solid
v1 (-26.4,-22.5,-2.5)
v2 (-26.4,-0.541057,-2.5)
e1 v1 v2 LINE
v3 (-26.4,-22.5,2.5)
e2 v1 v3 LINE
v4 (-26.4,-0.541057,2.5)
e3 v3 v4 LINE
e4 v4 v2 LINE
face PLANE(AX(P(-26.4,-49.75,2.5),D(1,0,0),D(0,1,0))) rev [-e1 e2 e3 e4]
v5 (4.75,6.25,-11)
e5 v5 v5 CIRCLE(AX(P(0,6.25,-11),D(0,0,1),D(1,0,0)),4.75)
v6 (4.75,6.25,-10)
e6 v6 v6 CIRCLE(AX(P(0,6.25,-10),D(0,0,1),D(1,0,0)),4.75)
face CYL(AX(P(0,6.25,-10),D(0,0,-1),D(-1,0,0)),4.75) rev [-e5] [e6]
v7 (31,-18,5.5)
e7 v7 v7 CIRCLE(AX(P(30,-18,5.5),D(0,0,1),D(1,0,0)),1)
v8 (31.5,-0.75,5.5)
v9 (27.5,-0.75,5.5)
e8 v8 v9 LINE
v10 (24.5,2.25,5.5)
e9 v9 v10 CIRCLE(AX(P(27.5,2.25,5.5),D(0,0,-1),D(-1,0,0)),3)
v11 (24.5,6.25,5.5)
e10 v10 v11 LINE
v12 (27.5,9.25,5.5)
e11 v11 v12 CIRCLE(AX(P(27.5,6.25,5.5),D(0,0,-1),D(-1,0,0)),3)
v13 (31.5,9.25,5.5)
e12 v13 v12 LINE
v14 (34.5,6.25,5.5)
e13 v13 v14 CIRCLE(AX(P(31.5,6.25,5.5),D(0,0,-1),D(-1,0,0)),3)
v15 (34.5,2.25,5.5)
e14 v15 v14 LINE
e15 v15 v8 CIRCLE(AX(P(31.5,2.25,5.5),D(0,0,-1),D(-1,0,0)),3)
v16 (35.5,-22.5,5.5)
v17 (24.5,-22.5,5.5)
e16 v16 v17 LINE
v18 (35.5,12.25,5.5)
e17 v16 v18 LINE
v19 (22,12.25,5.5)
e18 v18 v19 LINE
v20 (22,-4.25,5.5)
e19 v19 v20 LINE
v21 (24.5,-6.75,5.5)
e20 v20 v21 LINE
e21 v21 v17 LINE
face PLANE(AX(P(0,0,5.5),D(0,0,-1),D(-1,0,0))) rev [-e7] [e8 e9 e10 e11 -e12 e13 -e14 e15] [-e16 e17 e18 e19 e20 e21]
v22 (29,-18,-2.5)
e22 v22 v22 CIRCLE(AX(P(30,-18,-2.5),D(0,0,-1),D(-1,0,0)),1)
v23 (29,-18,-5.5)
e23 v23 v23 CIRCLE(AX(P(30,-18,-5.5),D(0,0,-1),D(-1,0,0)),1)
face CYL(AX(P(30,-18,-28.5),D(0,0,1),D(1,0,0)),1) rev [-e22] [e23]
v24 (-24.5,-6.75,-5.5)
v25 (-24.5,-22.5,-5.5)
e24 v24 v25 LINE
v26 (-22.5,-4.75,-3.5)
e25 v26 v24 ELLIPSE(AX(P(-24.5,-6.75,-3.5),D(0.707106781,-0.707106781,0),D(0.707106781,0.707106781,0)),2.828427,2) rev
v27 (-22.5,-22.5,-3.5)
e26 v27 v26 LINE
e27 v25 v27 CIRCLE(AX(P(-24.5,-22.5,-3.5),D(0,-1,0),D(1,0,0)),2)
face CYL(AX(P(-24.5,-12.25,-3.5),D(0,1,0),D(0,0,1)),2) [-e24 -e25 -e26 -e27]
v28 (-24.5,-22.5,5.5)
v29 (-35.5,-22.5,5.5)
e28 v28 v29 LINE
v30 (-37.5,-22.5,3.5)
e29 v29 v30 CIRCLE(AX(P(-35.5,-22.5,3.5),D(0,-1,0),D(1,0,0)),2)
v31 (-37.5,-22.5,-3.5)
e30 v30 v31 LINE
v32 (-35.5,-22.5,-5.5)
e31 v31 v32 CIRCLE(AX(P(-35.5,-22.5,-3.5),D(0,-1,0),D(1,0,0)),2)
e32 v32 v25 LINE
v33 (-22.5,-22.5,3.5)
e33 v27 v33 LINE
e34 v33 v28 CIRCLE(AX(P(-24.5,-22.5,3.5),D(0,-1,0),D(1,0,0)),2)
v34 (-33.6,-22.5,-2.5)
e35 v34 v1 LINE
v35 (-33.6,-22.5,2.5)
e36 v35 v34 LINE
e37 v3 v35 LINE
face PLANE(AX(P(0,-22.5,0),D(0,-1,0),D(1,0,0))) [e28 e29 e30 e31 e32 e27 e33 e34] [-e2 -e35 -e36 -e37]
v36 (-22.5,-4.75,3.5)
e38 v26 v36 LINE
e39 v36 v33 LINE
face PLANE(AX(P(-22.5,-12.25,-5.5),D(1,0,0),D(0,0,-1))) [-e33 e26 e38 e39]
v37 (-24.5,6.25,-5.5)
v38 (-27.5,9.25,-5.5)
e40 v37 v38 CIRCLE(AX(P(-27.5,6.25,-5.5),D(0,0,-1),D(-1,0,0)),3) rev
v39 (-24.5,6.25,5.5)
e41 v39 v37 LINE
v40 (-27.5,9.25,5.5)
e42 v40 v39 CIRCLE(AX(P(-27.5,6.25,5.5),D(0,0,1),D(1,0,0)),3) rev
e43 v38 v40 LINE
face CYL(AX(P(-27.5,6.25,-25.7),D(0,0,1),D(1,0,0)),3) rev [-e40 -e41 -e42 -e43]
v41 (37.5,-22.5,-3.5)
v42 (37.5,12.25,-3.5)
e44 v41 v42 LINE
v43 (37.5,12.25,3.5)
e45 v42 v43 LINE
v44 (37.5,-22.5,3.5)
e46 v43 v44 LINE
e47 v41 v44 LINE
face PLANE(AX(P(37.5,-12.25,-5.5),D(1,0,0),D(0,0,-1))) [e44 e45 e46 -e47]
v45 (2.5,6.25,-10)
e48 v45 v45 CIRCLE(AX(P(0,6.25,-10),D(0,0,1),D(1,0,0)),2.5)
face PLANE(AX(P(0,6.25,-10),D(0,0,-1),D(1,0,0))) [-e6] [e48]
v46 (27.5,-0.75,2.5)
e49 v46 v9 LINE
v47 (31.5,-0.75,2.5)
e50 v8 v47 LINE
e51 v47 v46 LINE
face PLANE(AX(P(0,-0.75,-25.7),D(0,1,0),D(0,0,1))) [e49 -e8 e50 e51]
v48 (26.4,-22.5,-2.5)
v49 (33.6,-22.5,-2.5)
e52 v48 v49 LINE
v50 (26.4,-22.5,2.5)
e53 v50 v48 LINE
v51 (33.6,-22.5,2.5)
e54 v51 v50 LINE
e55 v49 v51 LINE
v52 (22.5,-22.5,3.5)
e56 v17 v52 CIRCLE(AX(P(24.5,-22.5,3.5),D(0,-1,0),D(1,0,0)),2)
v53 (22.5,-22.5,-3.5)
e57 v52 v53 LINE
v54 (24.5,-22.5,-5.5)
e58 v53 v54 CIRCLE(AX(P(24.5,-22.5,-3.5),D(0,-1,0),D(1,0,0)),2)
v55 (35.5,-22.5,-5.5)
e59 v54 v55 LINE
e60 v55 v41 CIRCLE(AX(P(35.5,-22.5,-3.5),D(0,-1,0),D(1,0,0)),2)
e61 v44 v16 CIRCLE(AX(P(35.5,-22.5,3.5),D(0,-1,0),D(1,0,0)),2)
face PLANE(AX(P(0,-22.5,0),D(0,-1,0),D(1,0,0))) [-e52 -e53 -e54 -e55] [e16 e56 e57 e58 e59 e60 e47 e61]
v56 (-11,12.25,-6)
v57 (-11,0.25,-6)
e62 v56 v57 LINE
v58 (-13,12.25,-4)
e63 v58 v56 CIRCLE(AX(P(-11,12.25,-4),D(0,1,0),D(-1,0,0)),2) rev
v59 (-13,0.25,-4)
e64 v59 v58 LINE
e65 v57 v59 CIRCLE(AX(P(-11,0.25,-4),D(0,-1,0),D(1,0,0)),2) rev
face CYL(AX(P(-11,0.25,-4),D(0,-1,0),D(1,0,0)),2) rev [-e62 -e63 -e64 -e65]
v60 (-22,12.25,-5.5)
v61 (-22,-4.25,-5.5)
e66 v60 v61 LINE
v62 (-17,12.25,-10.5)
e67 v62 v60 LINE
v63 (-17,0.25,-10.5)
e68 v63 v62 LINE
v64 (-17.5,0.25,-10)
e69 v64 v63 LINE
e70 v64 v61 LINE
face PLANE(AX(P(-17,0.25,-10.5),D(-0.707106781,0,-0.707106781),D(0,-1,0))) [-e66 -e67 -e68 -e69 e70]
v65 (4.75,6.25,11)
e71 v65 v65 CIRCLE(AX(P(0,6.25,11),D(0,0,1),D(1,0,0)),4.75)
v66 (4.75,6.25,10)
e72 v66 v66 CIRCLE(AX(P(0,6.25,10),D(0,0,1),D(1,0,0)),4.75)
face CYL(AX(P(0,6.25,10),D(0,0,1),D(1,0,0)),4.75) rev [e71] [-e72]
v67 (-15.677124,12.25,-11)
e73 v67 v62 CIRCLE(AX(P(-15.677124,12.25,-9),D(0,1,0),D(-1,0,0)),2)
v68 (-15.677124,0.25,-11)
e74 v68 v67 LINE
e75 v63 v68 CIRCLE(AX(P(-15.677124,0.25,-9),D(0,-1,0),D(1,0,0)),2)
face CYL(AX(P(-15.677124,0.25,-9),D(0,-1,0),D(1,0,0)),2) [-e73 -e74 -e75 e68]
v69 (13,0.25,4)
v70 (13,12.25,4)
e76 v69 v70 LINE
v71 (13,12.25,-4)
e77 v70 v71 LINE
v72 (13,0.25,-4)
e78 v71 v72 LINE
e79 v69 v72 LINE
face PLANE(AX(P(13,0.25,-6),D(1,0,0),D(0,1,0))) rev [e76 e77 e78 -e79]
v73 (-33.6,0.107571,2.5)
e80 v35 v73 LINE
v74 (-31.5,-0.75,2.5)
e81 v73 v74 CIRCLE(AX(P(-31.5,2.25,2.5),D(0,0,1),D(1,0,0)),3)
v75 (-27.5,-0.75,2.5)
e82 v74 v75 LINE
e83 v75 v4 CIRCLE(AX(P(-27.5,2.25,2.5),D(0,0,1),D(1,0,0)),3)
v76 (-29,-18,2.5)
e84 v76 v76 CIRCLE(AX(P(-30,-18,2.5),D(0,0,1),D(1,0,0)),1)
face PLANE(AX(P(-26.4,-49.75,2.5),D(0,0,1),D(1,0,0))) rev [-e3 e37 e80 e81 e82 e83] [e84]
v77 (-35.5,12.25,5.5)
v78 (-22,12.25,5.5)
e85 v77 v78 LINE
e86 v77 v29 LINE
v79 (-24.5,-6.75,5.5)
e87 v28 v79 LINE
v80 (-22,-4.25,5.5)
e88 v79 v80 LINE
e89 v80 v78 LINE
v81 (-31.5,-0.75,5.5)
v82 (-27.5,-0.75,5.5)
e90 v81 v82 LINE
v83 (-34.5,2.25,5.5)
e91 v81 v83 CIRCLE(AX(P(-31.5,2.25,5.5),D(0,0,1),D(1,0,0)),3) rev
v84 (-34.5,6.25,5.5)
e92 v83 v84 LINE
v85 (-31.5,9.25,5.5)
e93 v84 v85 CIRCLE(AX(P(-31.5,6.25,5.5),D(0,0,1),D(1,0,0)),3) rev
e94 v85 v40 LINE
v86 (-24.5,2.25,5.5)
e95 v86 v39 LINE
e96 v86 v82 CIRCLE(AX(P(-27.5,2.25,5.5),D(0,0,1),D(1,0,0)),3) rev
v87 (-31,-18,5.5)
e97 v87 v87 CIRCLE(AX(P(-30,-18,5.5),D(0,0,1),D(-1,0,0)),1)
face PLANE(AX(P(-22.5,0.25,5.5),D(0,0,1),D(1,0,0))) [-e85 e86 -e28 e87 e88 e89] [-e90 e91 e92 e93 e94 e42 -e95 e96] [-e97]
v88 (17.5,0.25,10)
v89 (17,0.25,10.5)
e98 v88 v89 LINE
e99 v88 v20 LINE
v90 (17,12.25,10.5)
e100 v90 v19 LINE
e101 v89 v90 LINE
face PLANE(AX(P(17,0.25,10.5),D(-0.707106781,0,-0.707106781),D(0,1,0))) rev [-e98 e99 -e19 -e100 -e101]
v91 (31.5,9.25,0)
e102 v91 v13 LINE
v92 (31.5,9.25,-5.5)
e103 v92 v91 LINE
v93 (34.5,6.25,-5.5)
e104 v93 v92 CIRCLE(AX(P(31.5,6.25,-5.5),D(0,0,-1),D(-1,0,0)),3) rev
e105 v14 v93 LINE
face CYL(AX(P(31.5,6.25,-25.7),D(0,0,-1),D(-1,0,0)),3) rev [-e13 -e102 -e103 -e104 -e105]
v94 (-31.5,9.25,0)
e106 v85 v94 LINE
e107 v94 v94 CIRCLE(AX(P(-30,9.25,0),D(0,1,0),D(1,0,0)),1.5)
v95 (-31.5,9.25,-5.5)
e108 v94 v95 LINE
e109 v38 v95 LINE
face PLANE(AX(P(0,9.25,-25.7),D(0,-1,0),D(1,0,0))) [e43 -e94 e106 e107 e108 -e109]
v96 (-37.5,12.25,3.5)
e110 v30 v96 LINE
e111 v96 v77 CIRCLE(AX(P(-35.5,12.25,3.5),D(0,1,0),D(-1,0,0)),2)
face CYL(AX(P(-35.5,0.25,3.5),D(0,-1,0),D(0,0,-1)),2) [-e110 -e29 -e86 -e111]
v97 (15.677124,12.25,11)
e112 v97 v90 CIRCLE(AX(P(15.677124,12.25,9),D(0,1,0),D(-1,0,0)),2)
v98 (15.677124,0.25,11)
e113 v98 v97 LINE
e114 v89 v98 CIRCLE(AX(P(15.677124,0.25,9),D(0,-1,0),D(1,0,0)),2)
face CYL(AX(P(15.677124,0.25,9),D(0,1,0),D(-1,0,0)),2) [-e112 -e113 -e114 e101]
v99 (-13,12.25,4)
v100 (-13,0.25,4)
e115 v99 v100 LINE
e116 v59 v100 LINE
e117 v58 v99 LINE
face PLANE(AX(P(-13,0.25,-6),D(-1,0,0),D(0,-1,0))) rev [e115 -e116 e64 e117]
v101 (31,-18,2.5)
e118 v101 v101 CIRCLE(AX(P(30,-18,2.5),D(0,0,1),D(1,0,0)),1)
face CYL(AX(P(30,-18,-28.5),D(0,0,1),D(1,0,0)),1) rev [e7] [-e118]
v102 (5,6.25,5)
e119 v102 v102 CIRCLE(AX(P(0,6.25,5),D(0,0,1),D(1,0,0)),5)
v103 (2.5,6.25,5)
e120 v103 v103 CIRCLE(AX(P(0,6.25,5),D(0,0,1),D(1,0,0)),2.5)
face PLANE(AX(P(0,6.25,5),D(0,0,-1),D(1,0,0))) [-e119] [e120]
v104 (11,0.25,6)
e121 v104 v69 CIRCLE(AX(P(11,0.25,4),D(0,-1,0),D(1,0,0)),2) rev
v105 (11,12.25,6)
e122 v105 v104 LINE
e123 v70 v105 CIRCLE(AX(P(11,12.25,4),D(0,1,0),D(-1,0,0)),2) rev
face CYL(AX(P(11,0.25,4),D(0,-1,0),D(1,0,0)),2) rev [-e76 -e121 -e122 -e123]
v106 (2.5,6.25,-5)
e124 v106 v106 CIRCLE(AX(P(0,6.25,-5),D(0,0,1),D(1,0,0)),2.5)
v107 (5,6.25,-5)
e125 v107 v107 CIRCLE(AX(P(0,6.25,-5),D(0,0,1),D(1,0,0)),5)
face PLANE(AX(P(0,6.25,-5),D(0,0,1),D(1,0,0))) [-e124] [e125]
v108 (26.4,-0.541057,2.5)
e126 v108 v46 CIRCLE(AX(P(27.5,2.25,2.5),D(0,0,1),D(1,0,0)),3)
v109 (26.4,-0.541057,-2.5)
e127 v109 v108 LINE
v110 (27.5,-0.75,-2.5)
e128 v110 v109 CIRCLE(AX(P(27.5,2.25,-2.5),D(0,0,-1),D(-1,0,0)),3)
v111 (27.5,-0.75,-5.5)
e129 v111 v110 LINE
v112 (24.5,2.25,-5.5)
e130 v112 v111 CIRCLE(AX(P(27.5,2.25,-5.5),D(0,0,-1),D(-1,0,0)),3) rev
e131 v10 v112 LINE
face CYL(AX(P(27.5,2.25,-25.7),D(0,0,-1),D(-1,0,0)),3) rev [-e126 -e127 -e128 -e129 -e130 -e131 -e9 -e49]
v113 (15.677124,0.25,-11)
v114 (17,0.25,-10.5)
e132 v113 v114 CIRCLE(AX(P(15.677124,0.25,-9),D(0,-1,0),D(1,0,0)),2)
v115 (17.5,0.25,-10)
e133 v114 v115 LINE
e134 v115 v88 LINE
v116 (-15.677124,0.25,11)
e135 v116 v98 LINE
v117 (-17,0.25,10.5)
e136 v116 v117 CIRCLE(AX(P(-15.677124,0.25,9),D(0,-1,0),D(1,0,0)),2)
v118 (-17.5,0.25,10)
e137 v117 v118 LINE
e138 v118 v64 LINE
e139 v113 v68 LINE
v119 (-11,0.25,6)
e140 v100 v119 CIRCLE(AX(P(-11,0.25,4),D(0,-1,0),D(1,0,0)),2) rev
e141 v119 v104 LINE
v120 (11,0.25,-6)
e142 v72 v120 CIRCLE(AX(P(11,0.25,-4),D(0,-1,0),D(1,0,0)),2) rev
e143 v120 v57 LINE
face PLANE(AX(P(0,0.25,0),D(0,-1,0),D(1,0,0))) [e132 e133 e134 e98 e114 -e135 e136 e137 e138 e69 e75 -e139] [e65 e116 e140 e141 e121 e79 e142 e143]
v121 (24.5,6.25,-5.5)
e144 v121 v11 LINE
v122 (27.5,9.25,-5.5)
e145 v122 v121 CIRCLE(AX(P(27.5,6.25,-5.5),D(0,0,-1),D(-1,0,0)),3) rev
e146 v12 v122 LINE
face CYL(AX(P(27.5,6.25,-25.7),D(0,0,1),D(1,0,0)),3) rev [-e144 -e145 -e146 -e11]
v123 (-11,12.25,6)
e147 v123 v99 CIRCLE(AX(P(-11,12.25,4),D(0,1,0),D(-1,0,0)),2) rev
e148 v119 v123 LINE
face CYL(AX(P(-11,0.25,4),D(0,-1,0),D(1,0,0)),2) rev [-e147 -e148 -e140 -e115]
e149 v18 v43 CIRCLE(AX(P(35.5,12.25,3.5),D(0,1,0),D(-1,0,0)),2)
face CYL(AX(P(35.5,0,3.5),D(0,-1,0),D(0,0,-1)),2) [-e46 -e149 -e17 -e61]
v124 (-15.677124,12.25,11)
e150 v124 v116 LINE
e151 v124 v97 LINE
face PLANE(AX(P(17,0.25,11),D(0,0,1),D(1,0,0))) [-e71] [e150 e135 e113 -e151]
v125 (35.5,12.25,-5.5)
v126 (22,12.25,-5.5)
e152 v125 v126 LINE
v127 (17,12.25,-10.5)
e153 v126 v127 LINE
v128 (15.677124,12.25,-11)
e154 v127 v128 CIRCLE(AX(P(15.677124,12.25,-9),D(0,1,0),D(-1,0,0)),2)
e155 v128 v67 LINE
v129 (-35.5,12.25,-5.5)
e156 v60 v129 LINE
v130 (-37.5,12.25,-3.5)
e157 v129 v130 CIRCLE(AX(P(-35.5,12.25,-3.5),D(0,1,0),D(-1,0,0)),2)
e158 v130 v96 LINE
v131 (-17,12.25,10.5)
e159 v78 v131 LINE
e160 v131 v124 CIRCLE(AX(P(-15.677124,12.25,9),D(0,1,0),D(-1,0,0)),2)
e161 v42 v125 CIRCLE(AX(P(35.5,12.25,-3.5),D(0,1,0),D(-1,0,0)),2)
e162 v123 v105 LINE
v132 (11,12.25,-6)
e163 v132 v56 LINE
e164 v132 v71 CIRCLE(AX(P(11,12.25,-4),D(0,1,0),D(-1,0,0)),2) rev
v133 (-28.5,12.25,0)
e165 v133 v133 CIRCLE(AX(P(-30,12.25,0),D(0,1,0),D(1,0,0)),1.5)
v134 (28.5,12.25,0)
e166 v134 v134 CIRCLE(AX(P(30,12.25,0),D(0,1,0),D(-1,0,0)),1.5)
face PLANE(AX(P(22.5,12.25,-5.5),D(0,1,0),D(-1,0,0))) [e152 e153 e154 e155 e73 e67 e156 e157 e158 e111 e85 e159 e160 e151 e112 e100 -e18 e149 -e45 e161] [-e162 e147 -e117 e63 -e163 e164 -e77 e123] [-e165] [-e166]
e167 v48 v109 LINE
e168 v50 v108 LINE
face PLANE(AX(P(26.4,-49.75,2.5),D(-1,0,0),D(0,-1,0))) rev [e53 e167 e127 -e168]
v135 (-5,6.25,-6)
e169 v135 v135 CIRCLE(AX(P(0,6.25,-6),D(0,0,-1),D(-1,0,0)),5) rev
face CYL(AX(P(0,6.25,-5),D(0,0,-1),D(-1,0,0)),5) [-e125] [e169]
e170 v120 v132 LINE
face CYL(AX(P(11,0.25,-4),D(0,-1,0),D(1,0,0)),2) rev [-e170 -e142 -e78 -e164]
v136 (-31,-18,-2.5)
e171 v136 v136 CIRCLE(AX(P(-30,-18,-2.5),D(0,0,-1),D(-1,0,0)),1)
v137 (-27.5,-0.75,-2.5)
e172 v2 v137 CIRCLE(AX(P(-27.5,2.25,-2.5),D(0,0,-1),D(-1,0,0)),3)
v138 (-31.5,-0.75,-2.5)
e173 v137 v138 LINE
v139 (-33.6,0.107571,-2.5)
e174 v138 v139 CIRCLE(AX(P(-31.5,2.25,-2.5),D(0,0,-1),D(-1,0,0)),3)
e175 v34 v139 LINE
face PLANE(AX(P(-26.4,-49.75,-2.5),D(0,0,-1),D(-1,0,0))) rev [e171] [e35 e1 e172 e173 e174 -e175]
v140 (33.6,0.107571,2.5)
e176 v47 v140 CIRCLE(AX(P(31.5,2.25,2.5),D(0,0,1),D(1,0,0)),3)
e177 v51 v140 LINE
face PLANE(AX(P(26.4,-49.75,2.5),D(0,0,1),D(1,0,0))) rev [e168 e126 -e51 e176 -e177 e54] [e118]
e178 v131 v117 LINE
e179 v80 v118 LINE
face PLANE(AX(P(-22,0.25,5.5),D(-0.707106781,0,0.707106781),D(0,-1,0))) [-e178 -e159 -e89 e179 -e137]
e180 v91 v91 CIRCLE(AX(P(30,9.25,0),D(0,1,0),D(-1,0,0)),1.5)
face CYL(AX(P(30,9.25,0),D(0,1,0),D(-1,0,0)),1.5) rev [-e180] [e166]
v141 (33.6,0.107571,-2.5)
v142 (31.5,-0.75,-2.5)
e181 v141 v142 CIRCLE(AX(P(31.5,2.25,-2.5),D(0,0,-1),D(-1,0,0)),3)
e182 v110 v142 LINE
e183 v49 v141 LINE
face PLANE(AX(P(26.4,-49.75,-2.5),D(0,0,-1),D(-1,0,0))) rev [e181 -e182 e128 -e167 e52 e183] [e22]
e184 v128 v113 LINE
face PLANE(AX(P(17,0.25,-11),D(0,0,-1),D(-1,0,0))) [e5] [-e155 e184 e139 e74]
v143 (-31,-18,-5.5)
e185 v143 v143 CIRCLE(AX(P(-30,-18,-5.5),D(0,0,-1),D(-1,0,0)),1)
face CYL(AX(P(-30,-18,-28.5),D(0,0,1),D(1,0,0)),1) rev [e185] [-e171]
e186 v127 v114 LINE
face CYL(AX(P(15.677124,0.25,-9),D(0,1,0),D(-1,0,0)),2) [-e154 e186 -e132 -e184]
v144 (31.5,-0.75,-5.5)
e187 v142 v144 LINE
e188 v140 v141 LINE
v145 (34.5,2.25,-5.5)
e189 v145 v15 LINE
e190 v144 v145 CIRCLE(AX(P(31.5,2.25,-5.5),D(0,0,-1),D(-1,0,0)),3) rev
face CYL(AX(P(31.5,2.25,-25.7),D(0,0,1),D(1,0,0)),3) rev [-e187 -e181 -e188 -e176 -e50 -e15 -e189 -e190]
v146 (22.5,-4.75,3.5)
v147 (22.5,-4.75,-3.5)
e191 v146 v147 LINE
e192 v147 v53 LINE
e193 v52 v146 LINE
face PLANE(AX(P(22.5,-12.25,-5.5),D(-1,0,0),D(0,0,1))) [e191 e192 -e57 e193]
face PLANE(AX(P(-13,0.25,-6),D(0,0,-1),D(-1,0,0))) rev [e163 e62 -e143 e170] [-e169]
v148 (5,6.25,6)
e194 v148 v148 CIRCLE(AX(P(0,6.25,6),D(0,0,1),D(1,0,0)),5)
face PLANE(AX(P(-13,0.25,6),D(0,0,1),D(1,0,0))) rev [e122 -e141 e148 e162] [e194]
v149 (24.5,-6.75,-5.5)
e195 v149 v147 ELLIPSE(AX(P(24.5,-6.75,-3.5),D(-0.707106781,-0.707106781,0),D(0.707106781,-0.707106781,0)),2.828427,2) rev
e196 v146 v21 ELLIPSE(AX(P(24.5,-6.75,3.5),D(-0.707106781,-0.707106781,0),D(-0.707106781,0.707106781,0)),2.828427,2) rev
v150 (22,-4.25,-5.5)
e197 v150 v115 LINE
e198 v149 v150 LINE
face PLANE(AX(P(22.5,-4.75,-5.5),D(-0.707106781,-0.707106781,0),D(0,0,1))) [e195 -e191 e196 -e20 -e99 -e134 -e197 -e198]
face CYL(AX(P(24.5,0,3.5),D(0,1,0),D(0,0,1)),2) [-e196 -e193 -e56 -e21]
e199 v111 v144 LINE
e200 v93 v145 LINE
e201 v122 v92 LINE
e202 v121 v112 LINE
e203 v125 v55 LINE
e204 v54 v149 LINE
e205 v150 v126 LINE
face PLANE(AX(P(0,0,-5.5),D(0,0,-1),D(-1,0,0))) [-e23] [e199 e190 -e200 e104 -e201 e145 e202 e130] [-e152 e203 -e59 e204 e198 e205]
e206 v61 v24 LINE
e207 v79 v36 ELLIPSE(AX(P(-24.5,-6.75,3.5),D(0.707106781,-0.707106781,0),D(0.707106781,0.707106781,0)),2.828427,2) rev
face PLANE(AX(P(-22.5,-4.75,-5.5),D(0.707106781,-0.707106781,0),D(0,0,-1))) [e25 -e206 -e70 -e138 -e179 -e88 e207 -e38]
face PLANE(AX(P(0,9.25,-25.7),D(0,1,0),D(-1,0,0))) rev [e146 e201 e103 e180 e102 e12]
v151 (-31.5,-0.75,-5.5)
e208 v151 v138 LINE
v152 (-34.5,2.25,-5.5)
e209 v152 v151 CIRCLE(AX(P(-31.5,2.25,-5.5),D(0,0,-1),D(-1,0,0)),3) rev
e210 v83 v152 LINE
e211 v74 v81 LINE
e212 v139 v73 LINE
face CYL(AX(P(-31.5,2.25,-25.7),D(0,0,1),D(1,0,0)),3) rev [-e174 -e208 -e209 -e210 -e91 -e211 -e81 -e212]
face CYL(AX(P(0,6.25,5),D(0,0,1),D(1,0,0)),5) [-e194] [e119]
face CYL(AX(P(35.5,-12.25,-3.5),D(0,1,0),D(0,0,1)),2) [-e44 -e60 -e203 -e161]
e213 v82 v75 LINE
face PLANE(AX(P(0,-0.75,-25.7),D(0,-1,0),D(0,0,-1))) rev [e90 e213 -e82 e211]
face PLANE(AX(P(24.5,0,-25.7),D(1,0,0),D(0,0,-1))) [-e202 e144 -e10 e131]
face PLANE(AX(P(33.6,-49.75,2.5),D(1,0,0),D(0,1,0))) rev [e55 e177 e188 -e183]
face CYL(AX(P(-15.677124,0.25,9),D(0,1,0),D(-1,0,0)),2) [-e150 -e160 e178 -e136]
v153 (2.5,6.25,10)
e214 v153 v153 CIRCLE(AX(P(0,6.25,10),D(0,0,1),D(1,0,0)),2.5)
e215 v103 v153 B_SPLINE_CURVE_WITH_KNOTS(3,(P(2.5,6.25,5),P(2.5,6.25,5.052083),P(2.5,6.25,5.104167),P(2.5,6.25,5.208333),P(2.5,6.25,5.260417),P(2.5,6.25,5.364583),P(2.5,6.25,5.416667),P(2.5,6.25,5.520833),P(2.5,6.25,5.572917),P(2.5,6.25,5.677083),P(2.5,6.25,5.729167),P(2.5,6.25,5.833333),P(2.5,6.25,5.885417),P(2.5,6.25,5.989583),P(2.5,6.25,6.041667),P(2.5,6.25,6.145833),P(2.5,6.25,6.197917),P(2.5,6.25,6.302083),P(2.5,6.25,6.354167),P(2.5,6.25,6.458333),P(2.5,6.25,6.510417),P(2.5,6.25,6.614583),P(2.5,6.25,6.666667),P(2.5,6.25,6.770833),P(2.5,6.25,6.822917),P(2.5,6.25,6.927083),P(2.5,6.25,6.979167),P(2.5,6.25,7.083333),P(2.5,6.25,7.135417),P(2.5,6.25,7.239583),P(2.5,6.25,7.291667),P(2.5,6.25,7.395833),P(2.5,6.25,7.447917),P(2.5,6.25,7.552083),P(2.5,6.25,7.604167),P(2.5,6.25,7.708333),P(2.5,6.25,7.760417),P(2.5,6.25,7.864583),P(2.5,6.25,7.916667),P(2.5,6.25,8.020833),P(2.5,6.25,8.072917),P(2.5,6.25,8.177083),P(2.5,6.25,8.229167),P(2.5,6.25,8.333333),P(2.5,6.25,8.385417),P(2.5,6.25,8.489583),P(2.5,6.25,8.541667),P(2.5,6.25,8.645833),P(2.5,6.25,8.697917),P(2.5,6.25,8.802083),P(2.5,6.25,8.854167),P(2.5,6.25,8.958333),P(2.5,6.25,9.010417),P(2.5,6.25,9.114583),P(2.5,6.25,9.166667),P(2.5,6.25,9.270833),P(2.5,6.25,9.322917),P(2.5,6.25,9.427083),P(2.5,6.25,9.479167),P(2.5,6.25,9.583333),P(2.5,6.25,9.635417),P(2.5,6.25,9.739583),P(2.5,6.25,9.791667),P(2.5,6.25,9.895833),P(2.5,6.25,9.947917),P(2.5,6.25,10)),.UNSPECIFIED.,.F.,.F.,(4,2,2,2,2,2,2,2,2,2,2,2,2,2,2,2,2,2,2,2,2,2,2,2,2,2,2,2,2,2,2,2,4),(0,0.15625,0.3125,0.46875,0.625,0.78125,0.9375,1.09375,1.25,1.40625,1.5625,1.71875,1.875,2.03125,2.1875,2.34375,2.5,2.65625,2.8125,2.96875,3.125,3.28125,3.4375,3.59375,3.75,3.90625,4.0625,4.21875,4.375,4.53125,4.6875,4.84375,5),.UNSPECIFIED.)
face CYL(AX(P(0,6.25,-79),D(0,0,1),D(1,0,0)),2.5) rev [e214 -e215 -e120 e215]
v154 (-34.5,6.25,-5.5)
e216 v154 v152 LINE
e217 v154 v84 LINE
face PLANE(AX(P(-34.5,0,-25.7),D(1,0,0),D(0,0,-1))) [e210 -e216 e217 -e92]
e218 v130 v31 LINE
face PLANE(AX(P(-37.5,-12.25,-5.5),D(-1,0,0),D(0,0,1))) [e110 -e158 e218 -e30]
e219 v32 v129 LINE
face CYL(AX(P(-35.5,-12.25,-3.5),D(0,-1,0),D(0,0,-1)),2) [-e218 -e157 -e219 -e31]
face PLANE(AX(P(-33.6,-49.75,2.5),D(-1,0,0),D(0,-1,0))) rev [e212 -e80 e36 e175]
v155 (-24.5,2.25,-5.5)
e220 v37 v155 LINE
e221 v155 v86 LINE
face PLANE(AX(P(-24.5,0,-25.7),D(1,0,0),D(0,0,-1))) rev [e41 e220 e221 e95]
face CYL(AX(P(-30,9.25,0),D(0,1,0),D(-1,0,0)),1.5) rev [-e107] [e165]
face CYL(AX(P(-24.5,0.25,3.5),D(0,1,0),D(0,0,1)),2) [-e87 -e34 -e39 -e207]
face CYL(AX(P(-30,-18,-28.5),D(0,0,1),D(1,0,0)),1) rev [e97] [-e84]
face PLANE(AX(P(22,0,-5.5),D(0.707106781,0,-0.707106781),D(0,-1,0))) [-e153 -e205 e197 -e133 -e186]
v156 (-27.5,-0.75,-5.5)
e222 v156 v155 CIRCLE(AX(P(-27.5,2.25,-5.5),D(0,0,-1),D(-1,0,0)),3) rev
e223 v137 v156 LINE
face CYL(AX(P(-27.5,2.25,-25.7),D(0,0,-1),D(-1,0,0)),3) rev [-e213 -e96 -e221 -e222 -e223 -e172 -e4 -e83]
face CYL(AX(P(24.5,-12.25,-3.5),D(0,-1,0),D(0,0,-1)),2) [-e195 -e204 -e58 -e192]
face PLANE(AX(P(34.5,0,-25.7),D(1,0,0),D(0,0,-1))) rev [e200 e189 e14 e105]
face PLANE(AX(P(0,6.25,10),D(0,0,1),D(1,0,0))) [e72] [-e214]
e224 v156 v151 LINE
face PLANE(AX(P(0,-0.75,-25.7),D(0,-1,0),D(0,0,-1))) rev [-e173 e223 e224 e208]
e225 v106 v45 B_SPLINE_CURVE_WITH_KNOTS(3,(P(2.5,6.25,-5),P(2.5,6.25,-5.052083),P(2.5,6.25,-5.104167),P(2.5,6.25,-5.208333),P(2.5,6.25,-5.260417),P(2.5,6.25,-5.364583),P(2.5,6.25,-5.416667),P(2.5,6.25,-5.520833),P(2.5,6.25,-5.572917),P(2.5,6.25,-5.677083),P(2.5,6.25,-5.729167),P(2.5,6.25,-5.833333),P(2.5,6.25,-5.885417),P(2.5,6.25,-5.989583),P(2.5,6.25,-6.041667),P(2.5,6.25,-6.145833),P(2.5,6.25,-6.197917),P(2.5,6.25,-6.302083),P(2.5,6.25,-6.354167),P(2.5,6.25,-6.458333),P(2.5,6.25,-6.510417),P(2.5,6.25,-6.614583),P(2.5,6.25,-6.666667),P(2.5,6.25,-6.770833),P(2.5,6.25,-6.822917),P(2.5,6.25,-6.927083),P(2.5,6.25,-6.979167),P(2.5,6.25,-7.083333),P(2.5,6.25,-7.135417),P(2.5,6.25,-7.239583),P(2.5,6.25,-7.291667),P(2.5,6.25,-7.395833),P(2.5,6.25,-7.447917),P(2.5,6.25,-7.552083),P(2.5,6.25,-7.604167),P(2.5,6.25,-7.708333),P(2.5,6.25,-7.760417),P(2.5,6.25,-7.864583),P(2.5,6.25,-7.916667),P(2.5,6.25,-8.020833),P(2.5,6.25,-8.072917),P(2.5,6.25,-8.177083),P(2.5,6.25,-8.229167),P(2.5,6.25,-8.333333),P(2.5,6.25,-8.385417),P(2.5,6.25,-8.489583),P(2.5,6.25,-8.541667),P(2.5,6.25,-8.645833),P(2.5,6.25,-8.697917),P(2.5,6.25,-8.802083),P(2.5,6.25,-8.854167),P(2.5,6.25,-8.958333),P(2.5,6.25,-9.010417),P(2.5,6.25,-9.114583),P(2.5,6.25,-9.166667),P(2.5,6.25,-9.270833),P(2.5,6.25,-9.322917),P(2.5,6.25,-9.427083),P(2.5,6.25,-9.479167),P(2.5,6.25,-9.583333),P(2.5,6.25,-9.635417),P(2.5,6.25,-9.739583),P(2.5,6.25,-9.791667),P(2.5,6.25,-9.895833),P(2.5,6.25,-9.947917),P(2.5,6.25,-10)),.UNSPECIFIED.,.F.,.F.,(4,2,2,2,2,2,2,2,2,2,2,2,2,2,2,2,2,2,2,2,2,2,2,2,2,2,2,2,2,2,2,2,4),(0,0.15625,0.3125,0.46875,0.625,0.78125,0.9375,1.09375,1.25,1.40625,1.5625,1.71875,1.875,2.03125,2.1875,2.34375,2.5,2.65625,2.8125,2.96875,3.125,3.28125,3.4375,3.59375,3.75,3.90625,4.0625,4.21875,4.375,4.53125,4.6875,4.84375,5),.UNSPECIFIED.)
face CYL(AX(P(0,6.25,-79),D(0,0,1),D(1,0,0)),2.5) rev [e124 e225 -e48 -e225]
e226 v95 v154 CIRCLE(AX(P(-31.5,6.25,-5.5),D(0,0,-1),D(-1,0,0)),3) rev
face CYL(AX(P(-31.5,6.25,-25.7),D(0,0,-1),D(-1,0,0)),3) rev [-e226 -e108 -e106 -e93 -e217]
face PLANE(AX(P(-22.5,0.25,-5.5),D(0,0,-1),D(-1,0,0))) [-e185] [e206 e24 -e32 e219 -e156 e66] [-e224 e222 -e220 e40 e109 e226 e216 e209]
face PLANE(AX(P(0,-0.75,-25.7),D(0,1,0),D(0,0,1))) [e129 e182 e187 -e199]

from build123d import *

# Parameters (mm, degrees)
EXTRUDE_1_DEPTH        = 5.5
EXTRUDE_1_DEPTH_BACK   = 5.5
SKETCH_1_W             = 15
SKETCH_1_H             = 24.5
EXTRUDE_1_2_DEPTH      = 5.5
EXTRUDE_1_2_DEPTH_BACK = 5.5
SKETCH_2_W             = 7.2
SKETCH_2_H             = 5
CUT_EXTRUDE_1_DEPTH    = 62
SKETCH_3_W             = 26
SKETCH_3_H             = 12
EXTRUDE_2_DEPTH        = 12
SKETCH_4_R             = 2.5
CUT_EXTRUDE_2_DEPTH    = 90
CHAMFER_2_SIZE         = 5
FILLET_2_R             = 2
SKETCH_14_W            = 15
SKETCH_14_H            = 11
SKETCH_14_W_2          = 7.2
SKETCH_14_H_2          = 5
EXTRUDE_5_DEPTH        = 10.25
SKETCH_7_R             = 1
CUT_EXTRUDE_3_DEPTH    = 34
EXTRUDE_START          = 1
SKETCH_13_R            = 5
SKETCH_13_R_2          = 2.5
EXTRUDE_4_DEPTH        = 1
CHAMFER_3_SIZE         = 5
SKETCH_19_W            = 10
SKETCH_19_H            = 10
CUT_EXTRUDE_4_DEPTH    = 31.2
SKETCH_17_R            = 4.75
SKETCH_17_R_2          = 2.5
CUT_EXTRUDE_5_DEPTH    = 1
SKETCH_20_W            = 7.2
SKETCH_20_H            = 3
EXTRUDE_6_DEPTH        = 5
FILLET_6_R             = 3
FILLET_7_R             = 2
SKETCH_23_R            = 1.5
CUT_EXTRUDE_6_DEPTH    = 3


with BuildPart() as part:
    # 草图1 → 凸台-拉伸1 (new, two sides: drawn at the far end of the back side and taken through both)
    with BuildSketch(Plane.XY.offset(-EXTRUDE_1_DEPTH_BACK)):
        with Locations((30, 0)):
            Rectangle(SKETCH_1_W, SKETCH_1_H)
    extrude(amount=EXTRUDE_1_DEPTH + EXTRUDE_1_DEPTH_BACK)


with BuildPart() as body_2:
    # 草图1 → Extrude 1 2 (new, two sides: drawn at the far end of the back side and taken through both)
    with BuildSketch(Plane.XY.offset(-EXTRUDE_1_2_DEPTH_BACK)):
        with Locations((-30, 0)):
            Rectangle(SKETCH_1_W, SKETCH_1_H)
    extrude(amount=EXTRUDE_1_2_DEPTH + EXTRUDE_1_2_DEPTH_BACK)


with BuildPart() as cut_extrude_1_tool:
    # 草图2 → 切除-拉伸1 (new body)
    with BuildSketch(Plane(origin=(0, 12.25, 0), x_dir=(1, 0, 0), z_dir=(0, 1, 0))):
        with Locations((30, 0)):
            Rectangle(SKETCH_2_W, SKETCH_2_H)
        with Locations((-30, 0)):
            Rectangle(SKETCH_2_W, SKETCH_2_H)
    extrude(amount=-CUT_EXTRUDE_1_DEPTH)


with BuildPart() as part_1:
    add(part.part)

    # 切除-拉伸1: cut by cut_extrude_1_tool
    add(cut_extrude_1_tool.part, mode=Mode.SUBTRACT)



with BuildPart() as body_2_1:
    add(body_2.part)

    # 切除-拉伸1: cut by cut_extrude_1_tool
    add(cut_extrude_1_tool.part, mode=Mode.SUBTRACT)


with BuildPart() as part_2:
    add(part_1.part)

    add(body_2_1.part)  # 凸台-拉伸2 merges body 2
    # 草图3 → 凸台-拉伸2 (add)
    with BuildSketch(Plane(origin=(0, 12.25, 0), x_dir=(1, 0, 0), z_dir=(0, 1, 0))):
        Polygon((22.5, 5.5), (17, 5.5), (17, 11), (-17, 11), (-17, 5.5), (-22.5, 5.5), (-22.5, -5.5), (-17, -5.5), (-17, -11), (17, -11), (17, -5.5), (22.5, -5.5), align=None)
        Rectangle(SKETCH_3_W, SKETCH_3_H, mode=Mode.SUBTRACT)
    extrude(amount=-EXTRUDE_2_DEPTH)

    # 草图4 → 切除-拉伸2 (cut)
    with BuildSketch(Plane.XY.offset(11)):
        with Locations((0, 6.25)):
            Circle(SKETCH_4_R)
    extrude(amount=-CUT_EXTRUDE_2_DEPTH, mode=Mode.SUBTRACT)

    # 倒角2
    chamfer_2_edges = [part_2.edges().sort_by_distance(p)[0] for p in [
        (17, 6.25, 5.5),
        (-17, 6.25, 5.5),
        (-17, 6.25, -5.5),
        (17, 6.25, -5.5),
    ]]
    chamfer(chamfer_2_edges, length=CHAMFER_2_SIZE)

    # 圆角2
    # the kernel refuses this fillet: 2 mm, written as the material it adds along each edge
    with BuildSketch(Plane(origin=(-13, 12.25, 6), x_dir=(0, 0, -1), z_dir=(0, -1, 0)), Plane(origin=(13, 12.25, 6), x_dir=(-1, 0, 0), z_dir=(0, -1, 0)), Plane(origin=(13, 12.25, -6), x_dir=(0, 0, 1), z_dir=(0, -1, 0))) as fillet_2_piece_1:
        with BuildLine():
            CenterArc((FILLET_2_R, FILLET_2_R), FILLET_2_R, 180, 90)
            Line((0, FILLET_2_R), (0, 0))
            Line((0, 0), (FILLET_2_R, 0))
        make_face()
    extrude(amount=12)
    with BuildSketch(Plane(origin=(-13, 12.25, -6), x_dir=(0, 0, 1), z_dir=(0, -1, 0))) as fillet_2_piece_2:
        with BuildLine():
            CenterArc((FILLET_2_R, -FILLET_2_R), FILLET_2_R, 90, 90)
            Line((0, -FILLET_2_R), (0, 0))
            Line((0, 0), (FILLET_2_R, 0))
        make_face()
    extrude(amount=12)
    # the kernel refuses this fillet: 2 mm, written as the material it takes off along each edge
    with BuildSketch(Plane(origin=(17, 15.557189139, 11), x_dir=(0, 0, -1), z_dir=(0, -1, 0))) as fillet_2_2_piece_1:
        with BuildLine():
            CenterArc((2, -1.322875656), FILLET_2_R, 138.590377891, 41.409622109)
            Line((0, -1.322875656), (0, 0))
            Line((0, 0), (0.5, 0))
        make_face()
    extrude(amount=18.614378278, mode=Mode.SUBTRACT)
    with BuildSketch(Plane(origin=(-17, 15.557189139, 11), x_dir=(1, 0, 0), z_dir=(0, -1, 0))) as fillet_2_2_piece_2:
        with BuildLine():
            CenterArc((1.322875656, -2), FILLET_2_R, 90, 41.409622109)
            Line((0, -0.5), (0, 0))
            Line((0, 0), (1.322875656, 0))
        make_face()
    extrude(amount=18.614378278, mode=Mode.SUBTRACT)
    with BuildSketch(Plane(origin=(-17, 15.557189139, -11), x_dir=(1, 0, 0), z_dir=(0, -1, 0))) as fillet_2_2_piece_3:
        with BuildLine():
            CenterArc((1.322875656, 2), FILLET_2_R, 228.590377891, 41.409622109)
            Line((0, 0.5), (0, 0))
            Line((0, 0), (1.322875656, 0))
        make_face()
    extrude(amount=18.614378278, mode=Mode.SUBTRACT)
    with BuildSketch(Plane(origin=(17, 15.557189139, -11), x_dir=(0, 0, 1), z_dir=(0, -1, 0))) as fillet_2_2_piece_4:
        with BuildLine():
            CenterArc((2, 1.322875656), FILLET_2_R, 180, 41.409622109)
            Line((0, 1.322875656), (0, 0))
            Line((0, 0), (0.5, 0))
        make_face()
    extrude(amount=18.614378278, mode=Mode.SUBTRACT)

    # 草图14 → 凸台-拉伸5 (add)
    # profile 1 of 2: a face of its own
    with BuildSketch(Plane.XZ.offset(12.25)):
        with Locations((-30, 0)):
            Rectangle(SKETCH_14_W, SKETCH_14_H)
        with Locations((-30, 0)):
            Rectangle(SKETCH_14_W_2, SKETCH_14_H_2, mode=Mode.SUBTRACT)
    # profile 2 of 2: a face of its own
    with BuildSketch(Plane.XZ.offset(12.25)):
        with Locations((30, 0)):
            Rectangle(SKETCH_14_W, SKETCH_14_H)
        with Locations((30, 0)):
            Rectangle(SKETCH_14_W_2, SKETCH_14_H_2, mode=Mode.SUBTRACT)
    extrude(amount=EXTRUDE_5_DEPTH)

    # 草图7 → 切除-拉伸3 (cut)
    with BuildSketch(Plane.XY.offset(5.5)):
        with Locations(Location((30, -18, 0), (0, 0, 180))):
            Circle(SKETCH_7_R)
        with Locations(Location((-30, -18, 0), (0, 0, 180))):
            Circle(SKETCH_7_R)
    extrude(amount=-CUT_EXTRUDE_3_DEPTH, mode=Mode.SUBTRACT)

    # 草图13 → 凸台-拉伸4 (add)
    with BuildSketch(Plane.XY.offset(-6).offset(EXTRUDE_START)):
        with Locations(Location((0, 6.25, 0), (0, 0, 180))):
            Circle(SKETCH_13_R)
        with Locations((0, 6.25)):
            Circle(SKETCH_13_R_2, mode=Mode.SUBTRACT)
    extrude_4 = extrude(amount=-EXTRUDE_4_DEPTH)

    # 镜向1: 凸台-拉伸4 across plane
    add(extrude_4.mirror(Plane.XY))

    # 倒角3
    chamfer_3_edges = [part_2.edges().sort_by_distance(p)[0] for p in [
        (22.5, 0.25, 0),
        (-22.5, 0.25, 0),
    ]]
    chamfer(chamfer_3_edges, length=CHAMFER_3_SIZE)

    # 草图19 → 切除-拉伸4 (cut)
    with BuildSketch(Plane.XY.offset(5.5)):
        with Locations((-29.5, 4.25)):
            Rectangle(SKETCH_19_W, SKETCH_19_H)
        with Locations((29.5, 4.25)):
            Rectangle(SKETCH_19_W, SKETCH_19_H)
    extrude(amount=-CUT_EXTRUDE_4_DEPTH, mode=Mode.SUBTRACT)

    # 草图17 → 切除-拉伸5 (cut)
    with BuildSketch(Plane.XY.offset(11)):
        with Locations((0, 6.25)):
            Circle(SKETCH_17_R)
        with Locations((0, 6.25)):
            Circle(SKETCH_17_R_2, mode=Mode.SUBTRACT)
    cut_extrude_5 = extrude(amount=-CUT_EXTRUDE_5_DEPTH, mode=Mode.SUBTRACT)

    # 镜向2: 切除-拉伸5 across plane
    add(cut_extrude_5.mirror(Plane.XY), mode=Mode.SUBTRACT)

    # 草图20 → 凸台-拉伸6 (add)
    with BuildSketch(Plane.XY.offset(-2.5)):
        with Locations((-30, 10.75)):
            Rectangle(SKETCH_20_W, SKETCH_20_H)
        with Locations((30, 10.75)):
            Rectangle(SKETCH_20_W, SKETCH_20_H)
    extrude(amount=EXTRUDE_6_DEPTH)

    # 圆角6
    # the kernel refuses this fillet: 3 mm, written as the material it adds along each edge
    with BuildSketch(Plane(origin=(24.5, -0.75, 5.5), x_dir=(0, 1, 0), z_dir=(0, 0, -1))) as fillet_6_piece_1_section:
        with BuildLine():
            CenterArc((FILLET_6_R, FILLET_6_R), FILLET_6_R, 180, 90)
            Line((0, FILLET_6_R), (0, 0))
            Line((0, 0), (FILLET_6_R, 0))
        make_face()
    fillet_6_piece_1 = extrude(amount=11, mode=Mode.PRIVATE)
    fillet_6_piece_1 = split(fillet_6_piece_1, bisect_by=Plane(origin=(24.5, -0.75, 2.5), z_dir=(0, 0, 1)), keep=Keep.TOP, mode=Mode.PRIVATE)
    fillet_6_piece_1 = split(fillet_6_piece_1, bisect_by=Plane(origin=(26.4, -0.75, 5.5), z_dir=(-1, 0, 0)), keep=Keep.TOP, mode=Mode.PRIVATE)
    add(fillet_6_piece_1)
    with BuildSketch(Plane(origin=(24.5, -0.75, 5.5), x_dir=(0, 1, 0), z_dir=(0, 0, -1))) as fillet_6_piece_2_section:
        with BuildLine():
            CenterArc((FILLET_6_R, FILLET_6_R), FILLET_6_R, 180, 90)
            Line((0, FILLET_6_R), (0, 0))
            Line((0, 0), (FILLET_6_R, 0))
        make_face()
    fillet_6_piece_2 = extrude(amount=11, mode=Mode.PRIVATE)
    fillet_6_piece_2 = split(fillet_6_piece_2, bisect_by=Plane(origin=(24.5, -0.75, 2.5), z_dir=(0, 0, 1)), keep=Keep.TOP, mode=Mode.PRIVATE)
    fillet_6_piece_2 = split(fillet_6_piece_2, bisect_by=Plane(origin=(26.4, -0.75, 5.5), z_dir=(1, 0, 0)), keep=Keep.TOP, mode=Mode.PRIVATE)
    add(fillet_6_piece_2)
    with BuildSketch(Plane(origin=(24.5, -0.75, 5.5), x_dir=(0, 1, 0), z_dir=(0, 0, -1))) as fillet_6_piece_3_section:
        with BuildLine():
            CenterArc((FILLET_6_R, FILLET_6_R), FILLET_6_R, 180, 90)
            Line((0, FILLET_6_R), (0, 0))
            Line((0, 0), (FILLET_6_R, 0))
        make_face()
    fillet_6_piece_3 = extrude(amount=11, mode=Mode.PRIVATE)
    fillet_6_piece_3 = split(fillet_6_piece_3, bisect_by=Plane(origin=(24.5, -0.75, -2.5), z_dir=(0, 0, 1)), keep=Keep.TOP, mode=Mode.PRIVATE)
    fillet_6_piece_3 = split(fillet_6_piece_3, bisect_by=Plane(origin=(24.5, -0.75, 2.5), z_dir=(0, 0, -1)), keep=Keep.TOP, mode=Mode.PRIVATE)
    fillet_6_piece_3 = split(fillet_6_piece_3, bisect_by=Plane(origin=(26.4, -0.75, 5.5), z_dir=(-1, 0, 0)), keep=Keep.TOP, mode=Mode.PRIVATE)
    add(fillet_6_piece_3)
    with BuildSketch(Plane(origin=(24.5, -0.75, 5.5), x_dir=(0, 1, 0), z_dir=(0, 0, -1))) as fillet_6_piece_4_section:
        with BuildLine():
            CenterArc((FILLET_6_R, FILLET_6_R), FILLET_6_R, 180, 90)
            Line((0, FILLET_6_R), (0, 0))
            Line((0, 0), (FILLET_6_R, 0))
        make_face()
    fillet_6_piece_4 = extrude(amount=11, mode=Mode.PRIVATE)
    fillet_6_piece_4 = split(fillet_6_piece_4, bisect_by=Plane(origin=(24.5, -0.75, -2.5), z_dir=(0, 0, -1)), keep=Keep.TOP, mode=Mode.PRIVATE)
    fillet_6_piece_4 = split(fillet_6_piece_4, bisect_by=Plane(origin=(26.4, -0.75, 5.5), z_dir=(-1, 0, 0)), keep=Keep.TOP, mode=Mode.PRIVATE)
    add(fillet_6_piece_4)
    with BuildSketch(Plane(origin=(24.5, -0.75, 5.5), x_dir=(0, 1, 0), z_dir=(0, 0, -1))) as fillet_6_piece_5_section:
        with BuildLine():
            CenterArc((FILLET_6_R, FILLET_6_R), FILLET_6_R, 180, 90)
            Line((0, FILLET_6_R), (0, 0))
            Line((0, 0), (FILLET_6_R, 0))
        make_face()
    fillet_6_piece_5 = extrude(amount=11, mode=Mode.PRIVATE)
    fillet_6_piece_5 = split(fillet_6_piece_5, bisect_by=Plane(origin=(24.5, -0.75, -2.5), z_dir=(0, 0, -1)), keep=Keep.TOP, mode=Mode.PRIVATE)
    fillet_6_piece_5 = split(fillet_6_piece_5, bisect_by=Plane(origin=(26.4, -0.75, 5.5), z_dir=(1, 0, 0)), keep=Keep.TOP, mode=Mode.PRIVATE)
    add(fillet_6_piece_5)
    with BuildSketch(Plane(origin=(-24.5, -0.75, 5.5), x_dir=(-1, 0, 0), z_dir=(0, 0, -1))) as fillet_6_piece_6_section:
        with BuildLine():
            CenterArc((FILLET_6_R, FILLET_6_R), FILLET_6_R, 180, 90)
            Line((0, FILLET_6_R), (0, 0))
            Line((0, 0), (FILLET_6_R, 0))
        make_face()
    fillet_6_piece_6 = extrude(amount=11, mode=Mode.PRIVATE)
    fillet_6_piece_6 = split(fillet_6_piece_6, bisect_by=Plane(origin=(-24.5, -0.75, 2.5), z_dir=(0, 0, 1)), keep=Keep.TOP, mode=Mode.PRIVATE)
    fillet_6_piece_6 = split(fillet_6_piece_6, bisect_by=Plane(origin=(-26.4, -0.75, 5.5), z_dir=(-1, 0, 0)), keep=Keep.TOP, mode=Mode.PRIVATE)
    add(fillet_6_piece_6)
    with BuildSketch(Plane(origin=(-24.5, -0.75, 5.5), x_dir=(-1, 0, 0), z_dir=(0, 0, -1))) as fillet_6_piece_7_section:
        with BuildLine():
            CenterArc((FILLET_6_R, FILLET_6_R), FILLET_6_R, 180, 90)
            Line((0, FILLET_6_R), (0, 0))
            Line((0, 0), (FILLET_6_R, 0))
        make_face()
    fillet_6_piece_7 = extrude(amount=11, mode=Mode.PRIVATE)
    fillet_6_piece_7 = split(fillet_6_piece_7, bisect_by=Plane(origin=(-24.5, -0.75, 2.5), z_dir=(0, 0, 1)), keep=Keep.TOP, mode=Mode.PRIVATE)
    fillet_6_piece_7 = split(fillet_6_piece_7, bisect_by=Plane(origin=(-26.4, -0.75, 5.5), z_dir=(1, 0, 0)), keep=Keep.TOP, mode=Mode.PRIVATE)
    add(fillet_6_piece_7)
    with BuildSketch(Plane(origin=(-24.5, -0.75, 5.5), x_dir=(-1, 0, 0), z_dir=(0, 0, -1))) as fillet_6_piece_8_section:
        with BuildLine():
            CenterArc((FILLET_6_R, FILLET_6_R), FILLET_6_R, 180, 90)
            Line((0, FILLET_6_R), (0, 0))
            Line((0, 0), (FILLET_6_R, 0))
        make_face()
    fillet_6_piece_8 = extrude(amount=11, mode=Mode.PRIVATE)
    fillet_6_piece_8 = split(fillet_6_piece_8, bisect_by=Plane(origin=(-24.5, -0.75, 2.5), z_dir=(0, 0, -1)), keep=Keep.TOP, mode=Mode.PRIVATE)
    fillet_6_piece_8 = split(fillet_6_piece_8, bisect_by=Plane(origin=(-24.5, -0.75, -2.5), z_dir=(0, 0, 1)), keep=Keep.TOP, mode=Mode.PRIVATE)
    fillet_6_piece_8 = split(fillet_6_piece_8, bisect_by=Plane(origin=(-26.4, -0.75, 5.5), z_dir=(1, 0, 0)), keep=Keep.TOP, mode=Mode.PRIVATE)
    add(fillet_6_piece_8)
    with BuildSketch(Plane(origin=(-24.5, -0.75, 5.5), x_dir=(-1, 0, 0), z_dir=(0, 0, -1))) as fillet_6_piece_9_section:
        with BuildLine():
            CenterArc((FILLET_6_R, FILLET_6_R), FILLET_6_R, 180, 90)
            Line((0, FILLET_6_R), (0, 0))
            Line((0, 0), (FILLET_6_R, 0))
        make_face()
    fillet_6_piece_9 = extrude(amount=11, mode=Mode.PRIVATE)
    fillet_6_piece_9 = split(fillet_6_piece_9, bisect_by=Plane(origin=(-24.5, -0.75, -2.5), z_dir=(0, 0, -1)), keep=Keep.TOP, mode=Mode.PRIVATE)
    fillet_6_piece_9 = split(fillet_6_piece_9, bisect_by=Plane(origin=(-26.4, -0.75, 5.5), z_dir=(-1, 0, 0)), keep=Keep.TOP, mode=Mode.PRIVATE)
    add(fillet_6_piece_9)
    with BuildSketch(Plane(origin=(-24.5, -0.75, 5.5), x_dir=(-1, 0, 0), z_dir=(0, 0, -1))) as fillet_6_piece_10_section:
        with BuildLine():
            CenterArc((FILLET_6_R, FILLET_6_R), FILLET_6_R, 180, 90)
            Line((0, FILLET_6_R), (0, 0))
            Line((0, 0), (FILLET_6_R, 0))
        make_face()
    fillet_6_piece_10 = extrude(amount=11, mode=Mode.PRIVATE)
    fillet_6_piece_10 = split(fillet_6_piece_10, bisect_by=Plane(origin=(-24.5, -0.75, -2.5), z_dir=(0, 0, -1)), keep=Keep.TOP, mode=Mode.PRIVATE)
    fillet_6_piece_10 = split(fillet_6_piece_10, bisect_by=Plane(origin=(-26.4, -0.75, 5.5), z_dir=(1, 0, 0)), keep=Keep.TOP, mode=Mode.PRIVATE)
    add(fillet_6_piece_10)
    with BuildSketch(Plane(origin=(34.5, -0.75, 5.5), x_dir=(-1, 0, 0), z_dir=(0, 0, -1))) as fillet_6_piece_11_section:
        with BuildLine():
            CenterArc((FILLET_6_R, FILLET_6_R), FILLET_6_R, 180, 90)
            Line((0, FILLET_6_R), (0, 0))
            Line((0, 0), (FILLET_6_R, 0))
        make_face()
    fillet_6_piece_11 = extrude(amount=11, mode=Mode.PRIVATE)
    fillet_6_piece_11 = split(fillet_6_piece_11, bisect_by=Plane(origin=(33.6, -0.75, 5.5), z_dir=(-1, 0, 0)), keep=Keep.TOP, mode=Mode.PRIVATE)
    fillet_6_piece_11 = split(fillet_6_piece_11, bisect_by=Plane(origin=(34.5, -0.75, 2.5), z_dir=(0, 0, 1)), keep=Keep.TOP, mode=Mode.PRIVATE)
    add(fillet_6_piece_11)
    with BuildSketch(Plane(origin=(34.5, -0.75, 5.5), x_dir=(-1, 0, 0), z_dir=(0, 0, -1))) as fillet_6_piece_12_section:
        with BuildLine():
            CenterArc((FILLET_6_R, FILLET_6_R), FILLET_6_R, 180, 90)
            Line((0, FILLET_6_R), (0, 0))
            Line((0, 0), (FILLET_6_R, 0))
        make_face()
    fillet_6_piece_12 = extrude(amount=11, mode=Mode.PRIVATE)
    fillet_6_piece_12 = split(fillet_6_piece_12, bisect_by=Plane(origin=(33.6, -0.75, 5.5), z_dir=(1, 0, 0)), keep=Keep.TOP, mode=Mode.PRIVATE)
    fillet_6_piece_12 = split(fillet_6_piece_12, bisect_by=Plane(origin=(34.5, -0.75, 2.5), z_dir=(0, 0, 1)), keep=Keep.TOP, mode=Mode.PRIVATE)
    add(fillet_6_piece_12)
    with BuildSketch(Plane(origin=(34.5, -0.75, 5.5), x_dir=(-1, 0, 0), z_dir=(0, 0, -1))) as fillet_6_piece_13_section:
        with BuildLine():
            CenterArc((FILLET_6_R, FILLET_6_R), FILLET_6_R, 180, 90)
            Line((0, FILLET_6_R), (0, 0))
            Line((0, 0), (FILLET_6_R, 0))
        make_face()
    fillet_6_piece_13 = extrude(amount=11, mode=Mode.PRIVATE)
    fillet_6_piece_13 = split(fillet_6_piece_13, bisect_by=Plane(origin=(34.5, -0.75, -2.5), z_dir=(0, 0, 1)), keep=Keep.TOP, mode=Mode.PRIVATE)
    fillet_6_piece_13 = split(fillet_6_piece_13, bisect_by=Plane(origin=(33.6, -0.75, 5.5), z_dir=(1, 0, 0)), keep=Keep.TOP, mode=Mode.PRIVATE)
    fillet_6_piece_13 = split(fillet_6_piece_13, bisect_by=Plane(origin=(34.5, -0.75, 2.5), z_dir=(0, 0, -1)), keep=Keep.TOP, mode=Mode.PRIVATE)
    add(fillet_6_piece_13)
    with BuildSketch(Plane(origin=(34.5, -0.75, 5.5), x_dir=(-1, 0, 0), z_dir=(0, 0, -1))) as fillet_6_piece_14_section:
        with BuildLine():
            CenterArc((FILLET_6_R, FILLET_6_R), FILLET_6_R, 180, 90)
            Line((0, FILLET_6_R), (0, 0))
            Line((0, 0), (FILLET_6_R, 0))
        make_face()
    fillet_6_piece_14 = extrude(amount=11, mode=Mode.PRIVATE)
    fillet_6_piece_14 = split(fillet_6_piece_14, bisect_by=Plane(origin=(34.5, -0.75, -2.5), z_dir=(0, 0, -1)), keep=Keep.TOP, mode=Mode.PRIVATE)
    fillet_6_piece_14 = split(fillet_6_piece_14, bisect_by=Plane(origin=(33.6, -0.75, 5.5), z_dir=(-1, 0, 0)), keep=Keep.TOP, mode=Mode.PRIVATE)
    add(fillet_6_piece_14)
    with BuildSketch(Plane(origin=(34.5, -0.75, 5.5), x_dir=(-1, 0, 0), z_dir=(0, 0, -1))) as fillet_6_piece_15_section:
        with BuildLine():
            CenterArc((FILLET_6_R, FILLET_6_R), FILLET_6_R, 180, 90)
            Line((0, FILLET_6_R), (0, 0))
            Line((0, 0), (FILLET_6_R, 0))
        make_face()
    fillet_6_piece_15 = extrude(amount=11, mode=Mode.PRIVATE)
    fillet_6_piece_15 = split(fillet_6_piece_15, bisect_by=Plane(origin=(34.5, -0.75, -2.5), z_dir=(0, 0, -1)), keep=Keep.TOP, mode=Mode.PRIVATE)
    fillet_6_piece_15 = split(fillet_6_piece_15, bisect_by=Plane(origin=(33.6, -0.75, 5.5), z_dir=(1, 0, 0)), keep=Keep.TOP, mode=Mode.PRIVATE)
    add(fillet_6_piece_15)
    with BuildSketch(Plane(origin=(24.5, 9.25, 5.5), x_dir=(1, 0, 0), z_dir=(0, 0, -1)), Plane(origin=(-24.5, 9.25, 5.5), x_dir=(0, -1, 0), z_dir=(0, 0, -1)), Plane(origin=(-34.5, 9.25, 5.5), x_dir=(1, 0, 0), z_dir=(0, 0, -1))) as fillet_6_piece_16:
        with BuildLine():
            CenterArc((FILLET_6_R, FILLET_6_R), FILLET_6_R, 180, 90)
            Line((0, FILLET_6_R), (0, 0))
            Line((0, 0), (FILLET_6_R, 0))
        make_face()
    extrude(amount=11)
    with BuildSketch(Plane(origin=(34.5, 9.25, 5.5), x_dir=(-1, 0, 0), z_dir=(0, 0, -1))) as fillet_6_piece_17:
        with BuildLine():
            CenterArc((FILLET_6_R, -FILLET_6_R), FILLET_6_R, 90, 90)
            Line((0, -FILLET_6_R), (0, 0))
            Line((0, 0), (FILLET_6_R, 0))
        make_face()
    extrude(amount=11)
    with BuildSketch(Plane(origin=(-34.5, -0.75, 5.5), x_dir=(1, 0, 0), z_dir=(0, 0, -1))) as fillet_6_piece_18_section:
        with BuildLine():
            CenterArc((FILLET_6_R, -FILLET_6_R), FILLET_6_R, 90, 90)
            Line((0, -FILLET_6_R), (0, 0))
            Line((0, 0), (FILLET_6_R, 0))
        make_face()
    fillet_6_piece_18 = extrude(amount=11, mode=Mode.PRIVATE)
    fillet_6_piece_18 = split(fillet_6_piece_18, bisect_by=Plane(origin=(-34.5, -0.75, 2.5), z_dir=(0, 0, 1)), keep=Keep.TOP, mode=Mode.PRIVATE)
    fillet_6_piece_18 = split(fillet_6_piece_18, bisect_by=Plane(origin=(-33.6, -0.75, 5.5), z_dir=(1, 0, 0)), keep=Keep.TOP, mode=Mode.PRIVATE)
    add(fillet_6_piece_18)
    with BuildSketch(Plane(origin=(-34.5, -0.75, 5.5), x_dir=(1, 0, 0), z_dir=(0, 0, -1))) as fillet_6_piece_19_section:
        with BuildLine():
            CenterArc((FILLET_6_R, -FILLET_6_R), FILLET_6_R, 90, 90)
            Line((0, -FILLET_6_R), (0, 0))
            Line((0, 0), (FILLET_6_R, 0))
        make_face()
    fillet_6_piece_19 = extrude(amount=11, mode=Mode.PRIVATE)
    fillet_6_piece_19 = split(fillet_6_piece_19, bisect_by=Plane(origin=(-34.5, -0.75, 2.5), z_dir=(0, 0, 1)), keep=Keep.TOP, mode=Mode.PRIVATE)
    fillet_6_piece_19 = split(fillet_6_piece_19, bisect_by=Plane(origin=(-33.6, -0.75, 5.5), z_dir=(-1, 0, 0)), keep=Keep.TOP, mode=Mode.PRIVATE)
    add(fillet_6_piece_19)
    with BuildSketch(Plane(origin=(-34.5, -0.75, 5.5), x_dir=(1, 0, 0), z_dir=(0, 0, -1))) as fillet_6_piece_20_section:
        with BuildLine():
            CenterArc((FILLET_6_R, -FILLET_6_R), FILLET_6_R, 90, 90)
            Line((0, -FILLET_6_R), (0, 0))
            Line((0, 0), (FILLET_6_R, 0))
        make_face()
    fillet_6_piece_20 = extrude(amount=11, mode=Mode.PRIVATE)
    fillet_6_piece_20 = split(fillet_6_piece_20, bisect_by=Plane(origin=(-34.5, -0.75, 2.5), z_dir=(0, 0, -1)), keep=Keep.TOP, mode=Mode.PRIVATE)
    fillet_6_piece_20 = split(fillet_6_piece_20, bisect_by=Plane(origin=(-33.6, -0.75, 5.5), z_dir=(-1, 0, 0)), keep=Keep.TOP, mode=Mode.PRIVATE)
    fillet_6_piece_20 = split(fillet_6_piece_20, bisect_by=Plane(origin=(-34.5, -0.75, -2.5), z_dir=(0, 0, 1)), keep=Keep.TOP, mode=Mode.PRIVATE)
    add(fillet_6_piece_20)
    with BuildSketch(Plane(origin=(-34.5, -0.75, 5.5), x_dir=(1, 0, 0), z_dir=(0, 0, -1))) as fillet_6_piece_21_section:
        with BuildLine():
            CenterArc((FILLET_6_R, -FILLET_6_R), FILLET_6_R, 90, 90)
            Line((0, -FILLET_6_R), (0, 0))
            Line((0, 0), (FILLET_6_R, 0))
        make_face()
    fillet_6_piece_21 = extrude(amount=11, mode=Mode.PRIVATE)
    fillet_6_piece_21 = split(fillet_6_piece_21, bisect_by=Plane(origin=(-33.6, -0.75, 5.5), z_dir=(1, 0, 0)), keep=Keep.TOP, mode=Mode.PRIVATE)
    fillet_6_piece_21 = split(fillet_6_piece_21, bisect_by=Plane(origin=(-34.5, -0.75, -2.5), z_dir=(0, 0, -1)), keep=Keep.TOP, mode=Mode.PRIVATE)
    add(fillet_6_piece_21)
    with BuildSketch(Plane(origin=(-34.5, -0.75, 5.5), x_dir=(1, 0, 0), z_dir=(0, 0, -1))) as fillet_6_piece_22_section:
        with BuildLine():
            CenterArc((FILLET_6_R, -FILLET_6_R), FILLET_6_R, 90, 90)
            Line((0, -FILLET_6_R), (0, 0))
            Line((0, 0), (FILLET_6_R, 0))
        make_face()
    fillet_6_piece_22 = extrude(amount=11, mode=Mode.PRIVATE)
    fillet_6_piece_22 = split(fillet_6_piece_22, bisect_by=Plane(origin=(-33.6, -0.75, 5.5), z_dir=(-1, 0, 0)), keep=Keep.TOP, mode=Mode.PRIVATE)
    fillet_6_piece_22 = split(fillet_6_piece_22, bisect_by=Plane(origin=(-34.5, -0.75, -2.5), z_dir=(0, 0, -1)), keep=Keep.TOP, mode=Mode.PRIVATE)
    add(fillet_6_piece_22)

    # 圆角7
    fillet_7_edges = [part_2.edges().sort_by_distance(p)[0] for p in [
        (-37.5, -5.125, -5.5),
        (-22.5, -13.625, 5.5),
        (-37.5, -5.125, 5.5),
        (37.5, -5.125, 5.5),
        (22.5, -13.625, 5.5),
        (22.5, -13.625, -5.5),
        (37.5, -5.125, -5.5),
        (-22.5, -13.625, -5.5),
    ]]
    fillet(fillet_7_edges, radius=FILLET_7_R)

    # 草图23 → 切除-拉伸6 (cut)
    with BuildSketch(Plane(origin=(0, 12.25, 0), x_dir=(1, 0, 0), z_dir=(0, 1, 0))):
        with Locations(Location((30, 0, 0), (0, 0, 180))):
            Circle(SKETCH_23_R)
        with Locations(Location((-30, 0, 0), (0, 0, 180))):
            Circle(SKETCH_23_R)
    extrude(amount=-CUT_EXTRUDE_6_DEPTH, mode=Mode.SUBTRACT)


solid = part_2.part
